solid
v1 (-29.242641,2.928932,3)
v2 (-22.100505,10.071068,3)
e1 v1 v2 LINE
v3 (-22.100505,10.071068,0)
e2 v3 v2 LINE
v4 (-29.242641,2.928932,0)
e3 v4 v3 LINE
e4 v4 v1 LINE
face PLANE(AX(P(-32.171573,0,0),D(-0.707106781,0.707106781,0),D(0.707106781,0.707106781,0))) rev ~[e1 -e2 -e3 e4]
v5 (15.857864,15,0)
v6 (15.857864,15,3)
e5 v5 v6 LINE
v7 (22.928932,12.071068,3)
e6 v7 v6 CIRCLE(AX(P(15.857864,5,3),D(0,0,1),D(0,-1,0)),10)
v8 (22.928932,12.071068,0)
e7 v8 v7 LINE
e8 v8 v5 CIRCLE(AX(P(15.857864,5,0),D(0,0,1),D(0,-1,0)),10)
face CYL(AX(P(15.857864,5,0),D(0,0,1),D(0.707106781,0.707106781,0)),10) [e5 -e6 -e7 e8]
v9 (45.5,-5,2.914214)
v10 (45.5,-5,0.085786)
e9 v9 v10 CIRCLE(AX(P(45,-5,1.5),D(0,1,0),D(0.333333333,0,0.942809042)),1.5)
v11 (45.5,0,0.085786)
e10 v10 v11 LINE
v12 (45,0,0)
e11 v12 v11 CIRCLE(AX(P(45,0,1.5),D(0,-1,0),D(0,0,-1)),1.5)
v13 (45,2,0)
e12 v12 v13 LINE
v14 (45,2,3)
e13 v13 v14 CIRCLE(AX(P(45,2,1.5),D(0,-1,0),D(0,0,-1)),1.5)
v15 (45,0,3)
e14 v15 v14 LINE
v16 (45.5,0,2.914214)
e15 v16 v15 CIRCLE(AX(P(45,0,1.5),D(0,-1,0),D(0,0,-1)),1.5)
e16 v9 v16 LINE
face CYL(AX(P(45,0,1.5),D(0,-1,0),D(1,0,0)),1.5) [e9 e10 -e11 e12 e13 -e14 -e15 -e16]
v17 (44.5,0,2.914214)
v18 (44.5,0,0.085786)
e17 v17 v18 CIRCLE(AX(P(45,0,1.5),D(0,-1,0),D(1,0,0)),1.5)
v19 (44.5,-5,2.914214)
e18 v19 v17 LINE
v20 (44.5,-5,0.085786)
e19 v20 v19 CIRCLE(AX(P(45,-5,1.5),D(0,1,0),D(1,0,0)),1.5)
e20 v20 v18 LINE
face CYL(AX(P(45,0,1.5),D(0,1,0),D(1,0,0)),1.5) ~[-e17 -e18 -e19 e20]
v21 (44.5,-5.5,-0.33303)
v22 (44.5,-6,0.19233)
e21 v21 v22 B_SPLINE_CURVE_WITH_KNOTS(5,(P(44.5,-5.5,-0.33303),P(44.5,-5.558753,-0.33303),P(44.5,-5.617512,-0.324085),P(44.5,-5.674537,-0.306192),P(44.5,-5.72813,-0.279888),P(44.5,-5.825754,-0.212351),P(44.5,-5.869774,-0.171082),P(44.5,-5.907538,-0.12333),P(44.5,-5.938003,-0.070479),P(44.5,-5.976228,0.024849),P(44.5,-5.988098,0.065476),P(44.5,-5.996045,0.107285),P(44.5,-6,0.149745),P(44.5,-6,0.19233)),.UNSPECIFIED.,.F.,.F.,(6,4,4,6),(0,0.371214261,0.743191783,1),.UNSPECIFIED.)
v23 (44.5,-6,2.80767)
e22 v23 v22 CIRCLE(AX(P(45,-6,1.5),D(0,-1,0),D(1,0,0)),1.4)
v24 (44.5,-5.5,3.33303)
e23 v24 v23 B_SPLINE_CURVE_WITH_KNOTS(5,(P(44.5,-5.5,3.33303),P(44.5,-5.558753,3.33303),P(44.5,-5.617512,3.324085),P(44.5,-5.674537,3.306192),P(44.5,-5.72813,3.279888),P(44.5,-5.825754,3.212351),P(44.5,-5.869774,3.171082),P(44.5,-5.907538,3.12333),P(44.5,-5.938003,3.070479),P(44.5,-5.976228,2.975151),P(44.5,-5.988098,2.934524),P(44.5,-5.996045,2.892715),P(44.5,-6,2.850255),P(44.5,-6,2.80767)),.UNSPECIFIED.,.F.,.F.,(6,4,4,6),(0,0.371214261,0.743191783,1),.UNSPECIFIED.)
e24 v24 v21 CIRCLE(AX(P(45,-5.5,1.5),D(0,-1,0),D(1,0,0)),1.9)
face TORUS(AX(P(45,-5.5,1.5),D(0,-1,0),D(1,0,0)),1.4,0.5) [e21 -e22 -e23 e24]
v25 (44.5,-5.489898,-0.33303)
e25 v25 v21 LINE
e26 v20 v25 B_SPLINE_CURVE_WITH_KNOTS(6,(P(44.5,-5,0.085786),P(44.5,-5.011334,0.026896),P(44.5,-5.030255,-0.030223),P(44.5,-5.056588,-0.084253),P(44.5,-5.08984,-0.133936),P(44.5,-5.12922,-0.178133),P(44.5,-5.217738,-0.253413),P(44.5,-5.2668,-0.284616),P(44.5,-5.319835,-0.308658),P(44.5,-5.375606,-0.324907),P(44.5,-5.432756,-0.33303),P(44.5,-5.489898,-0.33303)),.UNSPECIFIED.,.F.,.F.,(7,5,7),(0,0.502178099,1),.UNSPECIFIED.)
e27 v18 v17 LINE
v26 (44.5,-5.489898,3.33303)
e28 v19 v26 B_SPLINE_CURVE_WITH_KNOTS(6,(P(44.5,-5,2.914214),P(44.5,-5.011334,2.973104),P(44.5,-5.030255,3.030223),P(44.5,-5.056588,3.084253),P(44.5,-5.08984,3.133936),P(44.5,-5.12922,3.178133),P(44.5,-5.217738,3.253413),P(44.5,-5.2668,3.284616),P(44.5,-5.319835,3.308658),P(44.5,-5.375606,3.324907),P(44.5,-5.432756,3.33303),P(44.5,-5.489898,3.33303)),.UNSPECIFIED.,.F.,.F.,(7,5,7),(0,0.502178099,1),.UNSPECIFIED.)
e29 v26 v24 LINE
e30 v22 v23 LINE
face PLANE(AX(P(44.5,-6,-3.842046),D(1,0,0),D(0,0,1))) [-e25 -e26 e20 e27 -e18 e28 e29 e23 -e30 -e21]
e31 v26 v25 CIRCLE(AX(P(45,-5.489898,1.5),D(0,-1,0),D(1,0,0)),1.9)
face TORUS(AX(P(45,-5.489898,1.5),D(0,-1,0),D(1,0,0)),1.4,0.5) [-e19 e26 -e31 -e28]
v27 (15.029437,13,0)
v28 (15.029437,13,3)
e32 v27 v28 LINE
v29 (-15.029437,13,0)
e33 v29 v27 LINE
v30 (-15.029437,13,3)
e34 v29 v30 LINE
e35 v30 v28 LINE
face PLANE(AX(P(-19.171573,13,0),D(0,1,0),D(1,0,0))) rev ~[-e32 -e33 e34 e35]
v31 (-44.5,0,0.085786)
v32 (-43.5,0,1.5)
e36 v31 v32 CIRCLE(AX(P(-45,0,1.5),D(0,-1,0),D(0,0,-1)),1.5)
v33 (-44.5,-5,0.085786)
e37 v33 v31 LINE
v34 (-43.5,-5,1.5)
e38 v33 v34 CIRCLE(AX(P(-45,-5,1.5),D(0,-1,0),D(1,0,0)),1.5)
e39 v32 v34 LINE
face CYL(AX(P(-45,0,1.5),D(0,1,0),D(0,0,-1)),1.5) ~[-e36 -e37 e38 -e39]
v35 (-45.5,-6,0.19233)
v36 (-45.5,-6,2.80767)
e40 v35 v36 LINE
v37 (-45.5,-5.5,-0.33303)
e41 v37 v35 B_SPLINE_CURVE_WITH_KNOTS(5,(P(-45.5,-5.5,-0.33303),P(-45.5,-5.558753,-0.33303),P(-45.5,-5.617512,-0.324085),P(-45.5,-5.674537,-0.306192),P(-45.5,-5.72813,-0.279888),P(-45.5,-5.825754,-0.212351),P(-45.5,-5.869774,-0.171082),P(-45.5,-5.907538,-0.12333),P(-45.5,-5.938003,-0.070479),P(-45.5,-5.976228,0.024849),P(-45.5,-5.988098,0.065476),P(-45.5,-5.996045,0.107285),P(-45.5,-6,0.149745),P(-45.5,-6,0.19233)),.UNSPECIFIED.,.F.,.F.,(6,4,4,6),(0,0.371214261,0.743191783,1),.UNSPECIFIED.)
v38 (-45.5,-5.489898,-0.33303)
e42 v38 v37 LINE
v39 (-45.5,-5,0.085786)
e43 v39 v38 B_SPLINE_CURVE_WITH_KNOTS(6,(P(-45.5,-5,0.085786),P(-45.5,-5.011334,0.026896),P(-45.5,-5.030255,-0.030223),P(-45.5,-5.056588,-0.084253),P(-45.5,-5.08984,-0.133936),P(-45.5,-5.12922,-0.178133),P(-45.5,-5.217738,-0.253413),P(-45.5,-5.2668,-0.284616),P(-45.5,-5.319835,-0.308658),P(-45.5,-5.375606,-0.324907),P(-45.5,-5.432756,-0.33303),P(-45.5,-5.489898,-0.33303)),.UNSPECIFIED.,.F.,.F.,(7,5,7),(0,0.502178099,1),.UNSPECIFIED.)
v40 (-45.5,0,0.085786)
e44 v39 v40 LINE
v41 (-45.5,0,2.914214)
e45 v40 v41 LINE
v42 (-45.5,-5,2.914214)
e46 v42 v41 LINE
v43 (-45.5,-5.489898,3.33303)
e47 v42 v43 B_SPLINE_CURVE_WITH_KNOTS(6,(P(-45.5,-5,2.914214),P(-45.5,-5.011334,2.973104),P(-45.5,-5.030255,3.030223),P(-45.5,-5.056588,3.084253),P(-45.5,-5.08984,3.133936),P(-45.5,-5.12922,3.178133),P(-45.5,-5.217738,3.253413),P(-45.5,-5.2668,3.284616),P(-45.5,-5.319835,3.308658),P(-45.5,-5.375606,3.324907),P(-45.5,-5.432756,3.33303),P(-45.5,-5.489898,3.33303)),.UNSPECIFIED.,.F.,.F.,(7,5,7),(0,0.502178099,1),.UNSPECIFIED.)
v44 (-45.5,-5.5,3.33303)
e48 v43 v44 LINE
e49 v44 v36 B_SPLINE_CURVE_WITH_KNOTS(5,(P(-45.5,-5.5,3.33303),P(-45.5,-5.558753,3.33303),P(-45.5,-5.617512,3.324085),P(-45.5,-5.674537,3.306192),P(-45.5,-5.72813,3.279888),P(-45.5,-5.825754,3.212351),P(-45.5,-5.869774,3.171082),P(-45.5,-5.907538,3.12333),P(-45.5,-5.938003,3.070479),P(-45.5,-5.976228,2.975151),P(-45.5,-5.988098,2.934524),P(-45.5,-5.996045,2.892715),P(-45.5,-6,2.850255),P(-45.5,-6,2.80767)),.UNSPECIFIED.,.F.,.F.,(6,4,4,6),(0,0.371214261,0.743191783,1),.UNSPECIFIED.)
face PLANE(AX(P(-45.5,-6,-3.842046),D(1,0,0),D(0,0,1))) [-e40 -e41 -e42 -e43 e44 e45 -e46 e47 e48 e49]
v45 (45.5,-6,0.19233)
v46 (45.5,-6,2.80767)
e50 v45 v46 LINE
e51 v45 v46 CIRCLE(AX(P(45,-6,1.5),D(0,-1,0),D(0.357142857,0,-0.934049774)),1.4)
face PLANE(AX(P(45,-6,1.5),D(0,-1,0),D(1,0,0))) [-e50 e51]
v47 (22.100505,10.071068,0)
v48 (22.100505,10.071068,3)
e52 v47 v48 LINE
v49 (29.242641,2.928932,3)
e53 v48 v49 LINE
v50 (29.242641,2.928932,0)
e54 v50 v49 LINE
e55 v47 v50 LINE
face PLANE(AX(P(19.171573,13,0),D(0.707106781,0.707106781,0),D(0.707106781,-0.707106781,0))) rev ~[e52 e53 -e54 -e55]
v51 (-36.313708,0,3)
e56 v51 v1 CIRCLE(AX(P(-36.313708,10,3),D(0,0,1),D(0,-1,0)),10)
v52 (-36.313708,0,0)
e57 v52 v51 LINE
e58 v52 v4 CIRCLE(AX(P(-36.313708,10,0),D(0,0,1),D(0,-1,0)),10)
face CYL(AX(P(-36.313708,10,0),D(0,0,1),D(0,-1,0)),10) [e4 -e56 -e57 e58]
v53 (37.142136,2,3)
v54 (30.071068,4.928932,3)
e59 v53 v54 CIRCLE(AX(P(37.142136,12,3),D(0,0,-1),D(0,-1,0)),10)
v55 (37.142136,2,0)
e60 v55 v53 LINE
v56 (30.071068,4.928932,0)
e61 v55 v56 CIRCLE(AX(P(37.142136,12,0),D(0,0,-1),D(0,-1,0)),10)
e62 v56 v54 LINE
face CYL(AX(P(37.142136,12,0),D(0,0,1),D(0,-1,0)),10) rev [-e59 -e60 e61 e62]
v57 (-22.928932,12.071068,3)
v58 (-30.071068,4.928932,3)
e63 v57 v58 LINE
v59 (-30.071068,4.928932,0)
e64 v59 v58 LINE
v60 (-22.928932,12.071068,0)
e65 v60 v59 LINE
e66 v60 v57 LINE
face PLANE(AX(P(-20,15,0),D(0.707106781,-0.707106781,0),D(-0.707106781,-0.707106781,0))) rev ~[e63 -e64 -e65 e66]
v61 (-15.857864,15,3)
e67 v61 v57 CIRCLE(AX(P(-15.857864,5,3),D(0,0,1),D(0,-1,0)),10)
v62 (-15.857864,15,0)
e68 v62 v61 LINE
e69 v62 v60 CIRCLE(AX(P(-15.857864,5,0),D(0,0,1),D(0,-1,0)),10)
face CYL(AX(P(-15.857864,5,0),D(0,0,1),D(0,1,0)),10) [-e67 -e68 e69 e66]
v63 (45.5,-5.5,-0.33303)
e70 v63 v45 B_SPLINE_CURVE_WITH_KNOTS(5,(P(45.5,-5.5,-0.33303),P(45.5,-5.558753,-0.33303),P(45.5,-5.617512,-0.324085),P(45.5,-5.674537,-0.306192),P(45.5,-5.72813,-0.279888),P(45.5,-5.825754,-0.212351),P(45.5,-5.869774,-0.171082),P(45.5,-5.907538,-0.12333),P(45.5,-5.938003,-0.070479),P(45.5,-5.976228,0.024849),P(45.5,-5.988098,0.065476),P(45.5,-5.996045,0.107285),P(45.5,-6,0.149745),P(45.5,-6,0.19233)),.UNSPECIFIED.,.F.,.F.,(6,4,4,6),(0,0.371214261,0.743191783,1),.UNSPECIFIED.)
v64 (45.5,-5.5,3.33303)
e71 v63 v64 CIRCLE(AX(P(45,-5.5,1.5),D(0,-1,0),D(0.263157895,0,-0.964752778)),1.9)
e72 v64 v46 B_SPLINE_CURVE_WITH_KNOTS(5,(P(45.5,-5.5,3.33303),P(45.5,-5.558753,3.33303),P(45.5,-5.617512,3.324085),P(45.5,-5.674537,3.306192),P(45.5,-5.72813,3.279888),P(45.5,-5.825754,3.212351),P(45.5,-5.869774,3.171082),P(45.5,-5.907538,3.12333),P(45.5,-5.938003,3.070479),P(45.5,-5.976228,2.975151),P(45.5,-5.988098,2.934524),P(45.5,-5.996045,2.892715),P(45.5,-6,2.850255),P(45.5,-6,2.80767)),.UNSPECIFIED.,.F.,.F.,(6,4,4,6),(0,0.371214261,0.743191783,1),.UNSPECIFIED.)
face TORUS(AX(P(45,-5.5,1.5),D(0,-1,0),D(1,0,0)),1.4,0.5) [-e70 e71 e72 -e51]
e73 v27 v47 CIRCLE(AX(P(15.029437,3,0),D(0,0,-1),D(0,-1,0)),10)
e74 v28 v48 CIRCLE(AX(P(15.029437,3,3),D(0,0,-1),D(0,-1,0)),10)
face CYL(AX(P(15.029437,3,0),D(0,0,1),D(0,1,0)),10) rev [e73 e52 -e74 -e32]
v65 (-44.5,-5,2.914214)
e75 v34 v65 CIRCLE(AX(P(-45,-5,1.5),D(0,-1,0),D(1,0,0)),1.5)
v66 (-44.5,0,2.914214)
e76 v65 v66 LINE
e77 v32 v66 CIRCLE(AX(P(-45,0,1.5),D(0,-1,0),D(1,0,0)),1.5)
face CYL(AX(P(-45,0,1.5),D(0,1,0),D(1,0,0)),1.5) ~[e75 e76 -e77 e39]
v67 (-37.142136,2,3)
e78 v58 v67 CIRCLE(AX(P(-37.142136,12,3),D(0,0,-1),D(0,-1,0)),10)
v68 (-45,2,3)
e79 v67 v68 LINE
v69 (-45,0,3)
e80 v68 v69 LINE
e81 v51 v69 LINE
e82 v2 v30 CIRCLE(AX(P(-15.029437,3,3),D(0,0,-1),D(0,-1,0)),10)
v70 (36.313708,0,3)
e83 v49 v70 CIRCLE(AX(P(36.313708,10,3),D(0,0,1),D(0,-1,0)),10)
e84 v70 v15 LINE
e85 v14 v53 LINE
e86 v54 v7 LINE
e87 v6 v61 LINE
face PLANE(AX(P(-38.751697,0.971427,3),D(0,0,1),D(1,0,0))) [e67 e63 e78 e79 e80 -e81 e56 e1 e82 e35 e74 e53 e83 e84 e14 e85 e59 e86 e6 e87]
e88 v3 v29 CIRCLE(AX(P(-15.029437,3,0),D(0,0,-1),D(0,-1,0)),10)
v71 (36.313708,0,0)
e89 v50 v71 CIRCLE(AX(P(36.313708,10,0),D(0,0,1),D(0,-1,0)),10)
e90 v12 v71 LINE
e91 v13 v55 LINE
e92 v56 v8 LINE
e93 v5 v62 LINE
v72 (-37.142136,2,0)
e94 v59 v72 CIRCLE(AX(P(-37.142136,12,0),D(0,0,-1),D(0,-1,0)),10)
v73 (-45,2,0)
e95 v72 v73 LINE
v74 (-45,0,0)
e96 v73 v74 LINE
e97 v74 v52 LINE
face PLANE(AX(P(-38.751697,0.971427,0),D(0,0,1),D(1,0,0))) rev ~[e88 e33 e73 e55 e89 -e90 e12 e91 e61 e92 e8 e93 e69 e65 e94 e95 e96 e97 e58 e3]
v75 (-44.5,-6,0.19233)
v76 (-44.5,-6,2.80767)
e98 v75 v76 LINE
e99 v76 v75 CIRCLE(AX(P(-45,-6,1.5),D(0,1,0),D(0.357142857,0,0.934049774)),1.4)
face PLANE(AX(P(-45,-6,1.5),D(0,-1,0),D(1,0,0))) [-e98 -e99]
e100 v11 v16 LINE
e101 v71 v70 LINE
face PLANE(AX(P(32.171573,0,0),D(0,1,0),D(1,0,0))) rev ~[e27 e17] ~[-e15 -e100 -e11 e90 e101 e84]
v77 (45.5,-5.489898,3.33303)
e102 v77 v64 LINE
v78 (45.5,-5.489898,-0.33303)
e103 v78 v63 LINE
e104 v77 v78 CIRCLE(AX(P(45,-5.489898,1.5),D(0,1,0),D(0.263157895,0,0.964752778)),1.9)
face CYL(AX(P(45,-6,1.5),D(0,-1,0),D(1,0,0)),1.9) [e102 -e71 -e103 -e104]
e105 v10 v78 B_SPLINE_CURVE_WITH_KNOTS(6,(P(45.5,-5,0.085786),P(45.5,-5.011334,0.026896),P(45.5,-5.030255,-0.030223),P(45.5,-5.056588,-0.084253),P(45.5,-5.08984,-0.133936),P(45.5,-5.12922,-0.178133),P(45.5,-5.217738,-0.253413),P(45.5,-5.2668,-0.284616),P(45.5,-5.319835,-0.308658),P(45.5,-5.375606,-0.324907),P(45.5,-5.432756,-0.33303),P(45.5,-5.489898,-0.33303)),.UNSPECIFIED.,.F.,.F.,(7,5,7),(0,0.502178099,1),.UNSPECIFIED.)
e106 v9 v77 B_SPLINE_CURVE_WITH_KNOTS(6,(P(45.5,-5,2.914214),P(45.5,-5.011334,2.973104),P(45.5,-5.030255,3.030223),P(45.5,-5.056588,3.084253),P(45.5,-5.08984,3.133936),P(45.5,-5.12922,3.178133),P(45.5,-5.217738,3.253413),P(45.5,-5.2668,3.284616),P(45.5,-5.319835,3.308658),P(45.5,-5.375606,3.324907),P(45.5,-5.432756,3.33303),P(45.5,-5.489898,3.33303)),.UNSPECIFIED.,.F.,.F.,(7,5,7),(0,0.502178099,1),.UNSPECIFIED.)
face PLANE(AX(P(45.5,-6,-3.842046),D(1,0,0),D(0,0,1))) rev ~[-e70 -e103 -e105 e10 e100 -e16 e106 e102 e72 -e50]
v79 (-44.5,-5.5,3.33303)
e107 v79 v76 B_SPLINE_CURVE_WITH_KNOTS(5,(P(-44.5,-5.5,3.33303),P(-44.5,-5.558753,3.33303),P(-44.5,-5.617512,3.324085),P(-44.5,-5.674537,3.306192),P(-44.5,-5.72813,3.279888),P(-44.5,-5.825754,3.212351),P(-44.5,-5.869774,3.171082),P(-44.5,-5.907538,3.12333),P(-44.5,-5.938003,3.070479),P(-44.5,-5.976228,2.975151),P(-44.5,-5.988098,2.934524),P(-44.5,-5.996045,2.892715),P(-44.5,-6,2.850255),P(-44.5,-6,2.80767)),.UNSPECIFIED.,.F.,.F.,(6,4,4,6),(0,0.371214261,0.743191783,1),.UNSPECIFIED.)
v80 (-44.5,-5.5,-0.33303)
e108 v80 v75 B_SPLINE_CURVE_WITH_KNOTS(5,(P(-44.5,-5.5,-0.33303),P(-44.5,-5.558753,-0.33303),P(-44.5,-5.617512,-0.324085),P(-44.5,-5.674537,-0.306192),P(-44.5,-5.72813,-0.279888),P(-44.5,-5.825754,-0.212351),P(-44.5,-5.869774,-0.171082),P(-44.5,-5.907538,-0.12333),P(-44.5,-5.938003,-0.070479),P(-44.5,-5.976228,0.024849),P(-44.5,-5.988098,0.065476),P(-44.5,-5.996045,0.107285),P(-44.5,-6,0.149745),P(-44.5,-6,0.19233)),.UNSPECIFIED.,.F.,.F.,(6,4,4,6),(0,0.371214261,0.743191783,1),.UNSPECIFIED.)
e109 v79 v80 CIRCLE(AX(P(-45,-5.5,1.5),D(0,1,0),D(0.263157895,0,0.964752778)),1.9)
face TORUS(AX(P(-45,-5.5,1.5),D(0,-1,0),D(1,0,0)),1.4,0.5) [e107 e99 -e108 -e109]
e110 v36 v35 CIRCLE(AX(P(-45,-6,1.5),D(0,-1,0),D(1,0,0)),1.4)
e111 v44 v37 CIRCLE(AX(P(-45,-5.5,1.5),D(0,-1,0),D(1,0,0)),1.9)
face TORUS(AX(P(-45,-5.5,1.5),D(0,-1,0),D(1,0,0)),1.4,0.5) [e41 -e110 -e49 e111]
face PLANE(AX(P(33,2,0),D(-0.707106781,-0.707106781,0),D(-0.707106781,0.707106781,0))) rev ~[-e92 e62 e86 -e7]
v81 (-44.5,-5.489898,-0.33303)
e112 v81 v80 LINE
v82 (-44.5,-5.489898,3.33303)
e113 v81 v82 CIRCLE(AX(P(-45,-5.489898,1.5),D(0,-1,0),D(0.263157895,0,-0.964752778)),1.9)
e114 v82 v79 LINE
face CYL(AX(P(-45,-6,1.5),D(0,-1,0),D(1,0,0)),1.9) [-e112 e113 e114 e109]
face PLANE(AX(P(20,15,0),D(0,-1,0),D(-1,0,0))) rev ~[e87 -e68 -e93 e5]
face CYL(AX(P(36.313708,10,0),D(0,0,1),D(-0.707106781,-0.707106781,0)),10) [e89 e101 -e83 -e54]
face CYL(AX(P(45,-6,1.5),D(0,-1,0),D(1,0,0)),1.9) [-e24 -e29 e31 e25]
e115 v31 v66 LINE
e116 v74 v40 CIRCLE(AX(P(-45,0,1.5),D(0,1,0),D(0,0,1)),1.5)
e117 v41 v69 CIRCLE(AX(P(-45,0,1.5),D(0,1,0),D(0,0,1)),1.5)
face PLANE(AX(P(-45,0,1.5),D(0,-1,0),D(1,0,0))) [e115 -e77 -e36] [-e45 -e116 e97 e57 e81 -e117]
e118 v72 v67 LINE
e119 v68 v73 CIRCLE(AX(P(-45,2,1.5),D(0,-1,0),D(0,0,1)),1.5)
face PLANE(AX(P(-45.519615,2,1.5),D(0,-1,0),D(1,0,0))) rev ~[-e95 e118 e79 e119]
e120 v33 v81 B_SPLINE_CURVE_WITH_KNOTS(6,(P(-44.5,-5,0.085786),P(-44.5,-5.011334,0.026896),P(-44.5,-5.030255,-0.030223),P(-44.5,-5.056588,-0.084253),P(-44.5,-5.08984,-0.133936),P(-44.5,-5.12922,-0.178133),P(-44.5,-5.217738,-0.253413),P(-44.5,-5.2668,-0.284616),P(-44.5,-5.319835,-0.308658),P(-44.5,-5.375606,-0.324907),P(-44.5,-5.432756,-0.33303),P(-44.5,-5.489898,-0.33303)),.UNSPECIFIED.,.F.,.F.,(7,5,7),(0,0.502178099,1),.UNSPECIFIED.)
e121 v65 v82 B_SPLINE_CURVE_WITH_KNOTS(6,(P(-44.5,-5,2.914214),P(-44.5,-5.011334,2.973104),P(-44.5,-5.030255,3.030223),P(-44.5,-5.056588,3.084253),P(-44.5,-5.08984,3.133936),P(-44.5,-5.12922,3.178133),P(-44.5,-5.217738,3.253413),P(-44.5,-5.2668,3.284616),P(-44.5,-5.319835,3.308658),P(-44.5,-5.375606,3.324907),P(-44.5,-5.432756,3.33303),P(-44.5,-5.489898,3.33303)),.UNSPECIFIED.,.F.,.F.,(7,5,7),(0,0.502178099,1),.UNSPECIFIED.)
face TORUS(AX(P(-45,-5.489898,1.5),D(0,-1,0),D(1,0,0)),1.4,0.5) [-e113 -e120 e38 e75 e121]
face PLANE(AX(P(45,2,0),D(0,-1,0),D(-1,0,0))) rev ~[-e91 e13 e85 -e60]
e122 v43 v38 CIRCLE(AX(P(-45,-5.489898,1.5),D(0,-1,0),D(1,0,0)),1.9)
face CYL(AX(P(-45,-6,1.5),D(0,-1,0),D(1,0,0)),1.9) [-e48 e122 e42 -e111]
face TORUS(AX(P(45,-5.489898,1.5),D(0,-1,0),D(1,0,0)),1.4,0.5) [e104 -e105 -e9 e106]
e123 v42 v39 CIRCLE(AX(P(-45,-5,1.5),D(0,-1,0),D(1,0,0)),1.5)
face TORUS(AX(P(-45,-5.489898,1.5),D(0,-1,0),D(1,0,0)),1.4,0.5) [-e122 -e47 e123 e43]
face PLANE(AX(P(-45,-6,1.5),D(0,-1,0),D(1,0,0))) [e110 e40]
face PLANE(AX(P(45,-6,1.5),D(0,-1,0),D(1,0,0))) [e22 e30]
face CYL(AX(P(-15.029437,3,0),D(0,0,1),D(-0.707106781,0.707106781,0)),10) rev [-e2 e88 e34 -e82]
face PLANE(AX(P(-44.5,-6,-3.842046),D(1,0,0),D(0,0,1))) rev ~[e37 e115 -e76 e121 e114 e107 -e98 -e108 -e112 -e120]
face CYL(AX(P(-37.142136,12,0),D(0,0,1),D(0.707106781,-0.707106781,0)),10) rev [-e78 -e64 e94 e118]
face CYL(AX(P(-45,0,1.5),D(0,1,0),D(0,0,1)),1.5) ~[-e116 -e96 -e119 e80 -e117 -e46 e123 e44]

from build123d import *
from build123d import SkipClean  # not in build123d's __all__

# Parameters (mm, degrees)
F1_DEPTH  = 3
F2_R      = 10
F3_R      = 1.5
F4_DEPTH  = 2
F5_DEPTH  = 6
F6_R      = 1.9
F6_R_2    = 1.5
F7_DEPTH  = 1
F9_W      = 1
F9_H      = 10.6840910192
F9_W_2    = 7.2588436306
F9_H_2    = 0.5
F9_W_3    = 6.9682821631
F10_DEPTH = 6


# Not quite as in the source:
# - a fillet or chamfer that OpenCascade refuses, or shapes differently, is made with other operations: its cross-section is extruded or revolved along the edge and cut away or added
# - after a boolean that leaves OpenCascade's solid faulty, fix() repairs it


with BuildPart() as f1:
    # F0 (on Top) → F1 (new body)
    with BuildSketch(Plane.XY):
        Polygon((-45, 2), (-45, 0), (-32.1715728753, 0), (-33, 2), align=None)
        Polygon((-33, 2), (-32.1715728753, 0), (-19.1715728753, 13), (-20, 15), align=None)
        Polygon((-20, 15), (-19.1715728753, 13), (0, 13), (0, 15), align=None)
        Polygon((0, 15), (0, 13), (19.1715728753, 13), (20, 15), align=None)
        Polygon((20, 15), (19.1715728753, 13), (32.1715728753, 0), (33, 2), align=None)
        Polygon((33, 2), (32.1715728753, 0), (45, 0), (45, 2), align=None)
    extrude(amount=F1_DEPTH)

    # F2
    f2_edges = [f1.edges().sort_by_distance(p)[0] for p in [
        (-33, 2, 1.5),
        (-20, 15, 1.5),
        (20, 15, 1.5),
        (33, 2, 1.5),
        (32.171573, 0, 1.5),
        (19.171573, 13, 1.5),
        (-19.171573, 13, 1.5),
        (-32.171573, 0, 1.5),
    ]]
    fillet(f2_edges, radius=F2_R)

    # F3 (on face) → F4 (join, through all)
    with BuildSketch(Plane.XZ):
        with BuildLine():
            Line((-45, 0), (-45, 3))
            ThreePointArc((-45, 3), (-46.5, 1.5), (-45, 0))
        make_face()
        with Locations((45, 1.5)):
            Circle(F3_R)
    extrude(amount=-F4_DEPTH)

    # F3 (on face) → F5 (join)
    with BuildSketch(Plane.XZ):
        with BuildLine():
            Line((-45, 0), (-45, 3))
            ThreePointArc((-45, 3), (-46.5, 1.5), (-45, 0))
        make_face()
        with BuildLine():
            ThreePointArc((-45, 0), (-43.9393398282, 0.4393398282), (-43.5, 1.5))
            ThreePointArc((-43.5, 1.5), (-43.9393398282, 2.5606601718), (-45, 3))
            Line((-45, 3), (-45, 0))
        make_face()
        with Locations((45, 1.5)):
            Circle(F3_R)
    with SkipClean():  # cleaning this boolean's faces spoils the solid; the shape is the same uncleaned
        extrude(amount=F5_DEPTH)

    # F6 (on face) → F7 (join)
    with BuildSketch(Plane.XZ.offset(6)):
        with Locations((-45, 1.5)):
            Circle(F6_R)
        with Locations((-45, 1.5)):
            Circle(F6_R_2, mode=Mode.SUBTRACT)
        with Locations((45, 1.5)):
            Circle(F6_R)
    extrude(amount=-F7_DEPTH)

    add(f1.part.fix(), mode=Mode.REPLACE)

    # F8: fillet of radius 0.5 on 4 edges, made by hand

    # F8_s1 → F8_t2 (revolve, cut)
    with BuildSketch(Plane.XY.offset(1.5)):
        with BuildLine():
            ThreePointArc((-43.1, -5.5), (-43.2464466094, -5.8535533906), (-43.6, -6))
            Line((-43.6, -6), (-43.1, -6))
            Line((-43.1, -6), (-43.1, -5.5))
        make_face()
    revolve(axis=Axis((-45, -6, 1.5), (0, -1, 0)), mode=Mode.SUBTRACT)

    # F8_s3 → F8_t4 (revolve, cut)
    with BuildSketch(Plane.XY.offset(1.5)):
        with BuildLine():
            ThreePointArc((-43.5, -5), (-43.2127016654, -5.1736701825), (-43.1, -5.4898979486))
            Line((-43.1, -5.4898979486), (-43.1, -5))
            Line((-43.1, -5), (-43.5, -5))
        make_face()
    revolve(axis=Axis((-45, -5, 1.5), (0, -1, 0)), mode=Mode.SUBTRACT)

    # F8_s5 → F8_t6 (revolve, cut)
    with BuildSketch(Plane.XY.offset(1.5)):
        with BuildLine():
            ThreePointArc((46.5, -5), (46.7872983346, -5.1736701825), (46.9, -5.4898979486))
            Line((46.9, -5.4898979486), (46.9, -5))
            Line((46.9, -5), (46.5, -5))
        make_face()
    revolve(axis=Axis((45, -5, 1.5), (0, -1, 0)), mode=Mode.SUBTRACT)

    # F8_s7 → F8_t8 (revolve, cut)
    with BuildSketch(Plane.XY.offset(1.5)):
        with BuildLine():
            ThreePointArc((46.9, -5.5), (46.7535533906, -5.8535533906), (46.4, -6))
            Line((46.4, -6), (46.9, -6))
            Line((46.9, -6), (46.9, -5.5))
        make_face()
    revolve(axis=Axis((45, -6, 1.5), (0, -1, 0)), mode=Mode.SUBTRACT)

    # F9 (on face) → F10 (cut, through all)
    with BuildSketch(Plane.XZ.offset(6)):
        with Locations((-45, 1.5)):
            Rectangle(F9_W, F9_H)
        with Locations((-54.3349329382, 3.15)):
            Rectangle(F9_W_2, F9_H_2)
        with Locations((-54.1896522045, -0.15)):
            Rectangle(F9_W_3, F9_H_2)
        with Locations((54.1896522045, -0.15)):
            Rectangle(F9_W_3, F9_H_2)
        with Locations((54.3349329382, 3.15)):
            Rectangle(F9_W_2, F9_H_2)
        with Locations((45, 1.5)):
            Rectangle(F9_W, F9_H)
    extrude(amount=-F10_DEPTH, mode=Mode.SUBTRACT)


solid = f1.part
